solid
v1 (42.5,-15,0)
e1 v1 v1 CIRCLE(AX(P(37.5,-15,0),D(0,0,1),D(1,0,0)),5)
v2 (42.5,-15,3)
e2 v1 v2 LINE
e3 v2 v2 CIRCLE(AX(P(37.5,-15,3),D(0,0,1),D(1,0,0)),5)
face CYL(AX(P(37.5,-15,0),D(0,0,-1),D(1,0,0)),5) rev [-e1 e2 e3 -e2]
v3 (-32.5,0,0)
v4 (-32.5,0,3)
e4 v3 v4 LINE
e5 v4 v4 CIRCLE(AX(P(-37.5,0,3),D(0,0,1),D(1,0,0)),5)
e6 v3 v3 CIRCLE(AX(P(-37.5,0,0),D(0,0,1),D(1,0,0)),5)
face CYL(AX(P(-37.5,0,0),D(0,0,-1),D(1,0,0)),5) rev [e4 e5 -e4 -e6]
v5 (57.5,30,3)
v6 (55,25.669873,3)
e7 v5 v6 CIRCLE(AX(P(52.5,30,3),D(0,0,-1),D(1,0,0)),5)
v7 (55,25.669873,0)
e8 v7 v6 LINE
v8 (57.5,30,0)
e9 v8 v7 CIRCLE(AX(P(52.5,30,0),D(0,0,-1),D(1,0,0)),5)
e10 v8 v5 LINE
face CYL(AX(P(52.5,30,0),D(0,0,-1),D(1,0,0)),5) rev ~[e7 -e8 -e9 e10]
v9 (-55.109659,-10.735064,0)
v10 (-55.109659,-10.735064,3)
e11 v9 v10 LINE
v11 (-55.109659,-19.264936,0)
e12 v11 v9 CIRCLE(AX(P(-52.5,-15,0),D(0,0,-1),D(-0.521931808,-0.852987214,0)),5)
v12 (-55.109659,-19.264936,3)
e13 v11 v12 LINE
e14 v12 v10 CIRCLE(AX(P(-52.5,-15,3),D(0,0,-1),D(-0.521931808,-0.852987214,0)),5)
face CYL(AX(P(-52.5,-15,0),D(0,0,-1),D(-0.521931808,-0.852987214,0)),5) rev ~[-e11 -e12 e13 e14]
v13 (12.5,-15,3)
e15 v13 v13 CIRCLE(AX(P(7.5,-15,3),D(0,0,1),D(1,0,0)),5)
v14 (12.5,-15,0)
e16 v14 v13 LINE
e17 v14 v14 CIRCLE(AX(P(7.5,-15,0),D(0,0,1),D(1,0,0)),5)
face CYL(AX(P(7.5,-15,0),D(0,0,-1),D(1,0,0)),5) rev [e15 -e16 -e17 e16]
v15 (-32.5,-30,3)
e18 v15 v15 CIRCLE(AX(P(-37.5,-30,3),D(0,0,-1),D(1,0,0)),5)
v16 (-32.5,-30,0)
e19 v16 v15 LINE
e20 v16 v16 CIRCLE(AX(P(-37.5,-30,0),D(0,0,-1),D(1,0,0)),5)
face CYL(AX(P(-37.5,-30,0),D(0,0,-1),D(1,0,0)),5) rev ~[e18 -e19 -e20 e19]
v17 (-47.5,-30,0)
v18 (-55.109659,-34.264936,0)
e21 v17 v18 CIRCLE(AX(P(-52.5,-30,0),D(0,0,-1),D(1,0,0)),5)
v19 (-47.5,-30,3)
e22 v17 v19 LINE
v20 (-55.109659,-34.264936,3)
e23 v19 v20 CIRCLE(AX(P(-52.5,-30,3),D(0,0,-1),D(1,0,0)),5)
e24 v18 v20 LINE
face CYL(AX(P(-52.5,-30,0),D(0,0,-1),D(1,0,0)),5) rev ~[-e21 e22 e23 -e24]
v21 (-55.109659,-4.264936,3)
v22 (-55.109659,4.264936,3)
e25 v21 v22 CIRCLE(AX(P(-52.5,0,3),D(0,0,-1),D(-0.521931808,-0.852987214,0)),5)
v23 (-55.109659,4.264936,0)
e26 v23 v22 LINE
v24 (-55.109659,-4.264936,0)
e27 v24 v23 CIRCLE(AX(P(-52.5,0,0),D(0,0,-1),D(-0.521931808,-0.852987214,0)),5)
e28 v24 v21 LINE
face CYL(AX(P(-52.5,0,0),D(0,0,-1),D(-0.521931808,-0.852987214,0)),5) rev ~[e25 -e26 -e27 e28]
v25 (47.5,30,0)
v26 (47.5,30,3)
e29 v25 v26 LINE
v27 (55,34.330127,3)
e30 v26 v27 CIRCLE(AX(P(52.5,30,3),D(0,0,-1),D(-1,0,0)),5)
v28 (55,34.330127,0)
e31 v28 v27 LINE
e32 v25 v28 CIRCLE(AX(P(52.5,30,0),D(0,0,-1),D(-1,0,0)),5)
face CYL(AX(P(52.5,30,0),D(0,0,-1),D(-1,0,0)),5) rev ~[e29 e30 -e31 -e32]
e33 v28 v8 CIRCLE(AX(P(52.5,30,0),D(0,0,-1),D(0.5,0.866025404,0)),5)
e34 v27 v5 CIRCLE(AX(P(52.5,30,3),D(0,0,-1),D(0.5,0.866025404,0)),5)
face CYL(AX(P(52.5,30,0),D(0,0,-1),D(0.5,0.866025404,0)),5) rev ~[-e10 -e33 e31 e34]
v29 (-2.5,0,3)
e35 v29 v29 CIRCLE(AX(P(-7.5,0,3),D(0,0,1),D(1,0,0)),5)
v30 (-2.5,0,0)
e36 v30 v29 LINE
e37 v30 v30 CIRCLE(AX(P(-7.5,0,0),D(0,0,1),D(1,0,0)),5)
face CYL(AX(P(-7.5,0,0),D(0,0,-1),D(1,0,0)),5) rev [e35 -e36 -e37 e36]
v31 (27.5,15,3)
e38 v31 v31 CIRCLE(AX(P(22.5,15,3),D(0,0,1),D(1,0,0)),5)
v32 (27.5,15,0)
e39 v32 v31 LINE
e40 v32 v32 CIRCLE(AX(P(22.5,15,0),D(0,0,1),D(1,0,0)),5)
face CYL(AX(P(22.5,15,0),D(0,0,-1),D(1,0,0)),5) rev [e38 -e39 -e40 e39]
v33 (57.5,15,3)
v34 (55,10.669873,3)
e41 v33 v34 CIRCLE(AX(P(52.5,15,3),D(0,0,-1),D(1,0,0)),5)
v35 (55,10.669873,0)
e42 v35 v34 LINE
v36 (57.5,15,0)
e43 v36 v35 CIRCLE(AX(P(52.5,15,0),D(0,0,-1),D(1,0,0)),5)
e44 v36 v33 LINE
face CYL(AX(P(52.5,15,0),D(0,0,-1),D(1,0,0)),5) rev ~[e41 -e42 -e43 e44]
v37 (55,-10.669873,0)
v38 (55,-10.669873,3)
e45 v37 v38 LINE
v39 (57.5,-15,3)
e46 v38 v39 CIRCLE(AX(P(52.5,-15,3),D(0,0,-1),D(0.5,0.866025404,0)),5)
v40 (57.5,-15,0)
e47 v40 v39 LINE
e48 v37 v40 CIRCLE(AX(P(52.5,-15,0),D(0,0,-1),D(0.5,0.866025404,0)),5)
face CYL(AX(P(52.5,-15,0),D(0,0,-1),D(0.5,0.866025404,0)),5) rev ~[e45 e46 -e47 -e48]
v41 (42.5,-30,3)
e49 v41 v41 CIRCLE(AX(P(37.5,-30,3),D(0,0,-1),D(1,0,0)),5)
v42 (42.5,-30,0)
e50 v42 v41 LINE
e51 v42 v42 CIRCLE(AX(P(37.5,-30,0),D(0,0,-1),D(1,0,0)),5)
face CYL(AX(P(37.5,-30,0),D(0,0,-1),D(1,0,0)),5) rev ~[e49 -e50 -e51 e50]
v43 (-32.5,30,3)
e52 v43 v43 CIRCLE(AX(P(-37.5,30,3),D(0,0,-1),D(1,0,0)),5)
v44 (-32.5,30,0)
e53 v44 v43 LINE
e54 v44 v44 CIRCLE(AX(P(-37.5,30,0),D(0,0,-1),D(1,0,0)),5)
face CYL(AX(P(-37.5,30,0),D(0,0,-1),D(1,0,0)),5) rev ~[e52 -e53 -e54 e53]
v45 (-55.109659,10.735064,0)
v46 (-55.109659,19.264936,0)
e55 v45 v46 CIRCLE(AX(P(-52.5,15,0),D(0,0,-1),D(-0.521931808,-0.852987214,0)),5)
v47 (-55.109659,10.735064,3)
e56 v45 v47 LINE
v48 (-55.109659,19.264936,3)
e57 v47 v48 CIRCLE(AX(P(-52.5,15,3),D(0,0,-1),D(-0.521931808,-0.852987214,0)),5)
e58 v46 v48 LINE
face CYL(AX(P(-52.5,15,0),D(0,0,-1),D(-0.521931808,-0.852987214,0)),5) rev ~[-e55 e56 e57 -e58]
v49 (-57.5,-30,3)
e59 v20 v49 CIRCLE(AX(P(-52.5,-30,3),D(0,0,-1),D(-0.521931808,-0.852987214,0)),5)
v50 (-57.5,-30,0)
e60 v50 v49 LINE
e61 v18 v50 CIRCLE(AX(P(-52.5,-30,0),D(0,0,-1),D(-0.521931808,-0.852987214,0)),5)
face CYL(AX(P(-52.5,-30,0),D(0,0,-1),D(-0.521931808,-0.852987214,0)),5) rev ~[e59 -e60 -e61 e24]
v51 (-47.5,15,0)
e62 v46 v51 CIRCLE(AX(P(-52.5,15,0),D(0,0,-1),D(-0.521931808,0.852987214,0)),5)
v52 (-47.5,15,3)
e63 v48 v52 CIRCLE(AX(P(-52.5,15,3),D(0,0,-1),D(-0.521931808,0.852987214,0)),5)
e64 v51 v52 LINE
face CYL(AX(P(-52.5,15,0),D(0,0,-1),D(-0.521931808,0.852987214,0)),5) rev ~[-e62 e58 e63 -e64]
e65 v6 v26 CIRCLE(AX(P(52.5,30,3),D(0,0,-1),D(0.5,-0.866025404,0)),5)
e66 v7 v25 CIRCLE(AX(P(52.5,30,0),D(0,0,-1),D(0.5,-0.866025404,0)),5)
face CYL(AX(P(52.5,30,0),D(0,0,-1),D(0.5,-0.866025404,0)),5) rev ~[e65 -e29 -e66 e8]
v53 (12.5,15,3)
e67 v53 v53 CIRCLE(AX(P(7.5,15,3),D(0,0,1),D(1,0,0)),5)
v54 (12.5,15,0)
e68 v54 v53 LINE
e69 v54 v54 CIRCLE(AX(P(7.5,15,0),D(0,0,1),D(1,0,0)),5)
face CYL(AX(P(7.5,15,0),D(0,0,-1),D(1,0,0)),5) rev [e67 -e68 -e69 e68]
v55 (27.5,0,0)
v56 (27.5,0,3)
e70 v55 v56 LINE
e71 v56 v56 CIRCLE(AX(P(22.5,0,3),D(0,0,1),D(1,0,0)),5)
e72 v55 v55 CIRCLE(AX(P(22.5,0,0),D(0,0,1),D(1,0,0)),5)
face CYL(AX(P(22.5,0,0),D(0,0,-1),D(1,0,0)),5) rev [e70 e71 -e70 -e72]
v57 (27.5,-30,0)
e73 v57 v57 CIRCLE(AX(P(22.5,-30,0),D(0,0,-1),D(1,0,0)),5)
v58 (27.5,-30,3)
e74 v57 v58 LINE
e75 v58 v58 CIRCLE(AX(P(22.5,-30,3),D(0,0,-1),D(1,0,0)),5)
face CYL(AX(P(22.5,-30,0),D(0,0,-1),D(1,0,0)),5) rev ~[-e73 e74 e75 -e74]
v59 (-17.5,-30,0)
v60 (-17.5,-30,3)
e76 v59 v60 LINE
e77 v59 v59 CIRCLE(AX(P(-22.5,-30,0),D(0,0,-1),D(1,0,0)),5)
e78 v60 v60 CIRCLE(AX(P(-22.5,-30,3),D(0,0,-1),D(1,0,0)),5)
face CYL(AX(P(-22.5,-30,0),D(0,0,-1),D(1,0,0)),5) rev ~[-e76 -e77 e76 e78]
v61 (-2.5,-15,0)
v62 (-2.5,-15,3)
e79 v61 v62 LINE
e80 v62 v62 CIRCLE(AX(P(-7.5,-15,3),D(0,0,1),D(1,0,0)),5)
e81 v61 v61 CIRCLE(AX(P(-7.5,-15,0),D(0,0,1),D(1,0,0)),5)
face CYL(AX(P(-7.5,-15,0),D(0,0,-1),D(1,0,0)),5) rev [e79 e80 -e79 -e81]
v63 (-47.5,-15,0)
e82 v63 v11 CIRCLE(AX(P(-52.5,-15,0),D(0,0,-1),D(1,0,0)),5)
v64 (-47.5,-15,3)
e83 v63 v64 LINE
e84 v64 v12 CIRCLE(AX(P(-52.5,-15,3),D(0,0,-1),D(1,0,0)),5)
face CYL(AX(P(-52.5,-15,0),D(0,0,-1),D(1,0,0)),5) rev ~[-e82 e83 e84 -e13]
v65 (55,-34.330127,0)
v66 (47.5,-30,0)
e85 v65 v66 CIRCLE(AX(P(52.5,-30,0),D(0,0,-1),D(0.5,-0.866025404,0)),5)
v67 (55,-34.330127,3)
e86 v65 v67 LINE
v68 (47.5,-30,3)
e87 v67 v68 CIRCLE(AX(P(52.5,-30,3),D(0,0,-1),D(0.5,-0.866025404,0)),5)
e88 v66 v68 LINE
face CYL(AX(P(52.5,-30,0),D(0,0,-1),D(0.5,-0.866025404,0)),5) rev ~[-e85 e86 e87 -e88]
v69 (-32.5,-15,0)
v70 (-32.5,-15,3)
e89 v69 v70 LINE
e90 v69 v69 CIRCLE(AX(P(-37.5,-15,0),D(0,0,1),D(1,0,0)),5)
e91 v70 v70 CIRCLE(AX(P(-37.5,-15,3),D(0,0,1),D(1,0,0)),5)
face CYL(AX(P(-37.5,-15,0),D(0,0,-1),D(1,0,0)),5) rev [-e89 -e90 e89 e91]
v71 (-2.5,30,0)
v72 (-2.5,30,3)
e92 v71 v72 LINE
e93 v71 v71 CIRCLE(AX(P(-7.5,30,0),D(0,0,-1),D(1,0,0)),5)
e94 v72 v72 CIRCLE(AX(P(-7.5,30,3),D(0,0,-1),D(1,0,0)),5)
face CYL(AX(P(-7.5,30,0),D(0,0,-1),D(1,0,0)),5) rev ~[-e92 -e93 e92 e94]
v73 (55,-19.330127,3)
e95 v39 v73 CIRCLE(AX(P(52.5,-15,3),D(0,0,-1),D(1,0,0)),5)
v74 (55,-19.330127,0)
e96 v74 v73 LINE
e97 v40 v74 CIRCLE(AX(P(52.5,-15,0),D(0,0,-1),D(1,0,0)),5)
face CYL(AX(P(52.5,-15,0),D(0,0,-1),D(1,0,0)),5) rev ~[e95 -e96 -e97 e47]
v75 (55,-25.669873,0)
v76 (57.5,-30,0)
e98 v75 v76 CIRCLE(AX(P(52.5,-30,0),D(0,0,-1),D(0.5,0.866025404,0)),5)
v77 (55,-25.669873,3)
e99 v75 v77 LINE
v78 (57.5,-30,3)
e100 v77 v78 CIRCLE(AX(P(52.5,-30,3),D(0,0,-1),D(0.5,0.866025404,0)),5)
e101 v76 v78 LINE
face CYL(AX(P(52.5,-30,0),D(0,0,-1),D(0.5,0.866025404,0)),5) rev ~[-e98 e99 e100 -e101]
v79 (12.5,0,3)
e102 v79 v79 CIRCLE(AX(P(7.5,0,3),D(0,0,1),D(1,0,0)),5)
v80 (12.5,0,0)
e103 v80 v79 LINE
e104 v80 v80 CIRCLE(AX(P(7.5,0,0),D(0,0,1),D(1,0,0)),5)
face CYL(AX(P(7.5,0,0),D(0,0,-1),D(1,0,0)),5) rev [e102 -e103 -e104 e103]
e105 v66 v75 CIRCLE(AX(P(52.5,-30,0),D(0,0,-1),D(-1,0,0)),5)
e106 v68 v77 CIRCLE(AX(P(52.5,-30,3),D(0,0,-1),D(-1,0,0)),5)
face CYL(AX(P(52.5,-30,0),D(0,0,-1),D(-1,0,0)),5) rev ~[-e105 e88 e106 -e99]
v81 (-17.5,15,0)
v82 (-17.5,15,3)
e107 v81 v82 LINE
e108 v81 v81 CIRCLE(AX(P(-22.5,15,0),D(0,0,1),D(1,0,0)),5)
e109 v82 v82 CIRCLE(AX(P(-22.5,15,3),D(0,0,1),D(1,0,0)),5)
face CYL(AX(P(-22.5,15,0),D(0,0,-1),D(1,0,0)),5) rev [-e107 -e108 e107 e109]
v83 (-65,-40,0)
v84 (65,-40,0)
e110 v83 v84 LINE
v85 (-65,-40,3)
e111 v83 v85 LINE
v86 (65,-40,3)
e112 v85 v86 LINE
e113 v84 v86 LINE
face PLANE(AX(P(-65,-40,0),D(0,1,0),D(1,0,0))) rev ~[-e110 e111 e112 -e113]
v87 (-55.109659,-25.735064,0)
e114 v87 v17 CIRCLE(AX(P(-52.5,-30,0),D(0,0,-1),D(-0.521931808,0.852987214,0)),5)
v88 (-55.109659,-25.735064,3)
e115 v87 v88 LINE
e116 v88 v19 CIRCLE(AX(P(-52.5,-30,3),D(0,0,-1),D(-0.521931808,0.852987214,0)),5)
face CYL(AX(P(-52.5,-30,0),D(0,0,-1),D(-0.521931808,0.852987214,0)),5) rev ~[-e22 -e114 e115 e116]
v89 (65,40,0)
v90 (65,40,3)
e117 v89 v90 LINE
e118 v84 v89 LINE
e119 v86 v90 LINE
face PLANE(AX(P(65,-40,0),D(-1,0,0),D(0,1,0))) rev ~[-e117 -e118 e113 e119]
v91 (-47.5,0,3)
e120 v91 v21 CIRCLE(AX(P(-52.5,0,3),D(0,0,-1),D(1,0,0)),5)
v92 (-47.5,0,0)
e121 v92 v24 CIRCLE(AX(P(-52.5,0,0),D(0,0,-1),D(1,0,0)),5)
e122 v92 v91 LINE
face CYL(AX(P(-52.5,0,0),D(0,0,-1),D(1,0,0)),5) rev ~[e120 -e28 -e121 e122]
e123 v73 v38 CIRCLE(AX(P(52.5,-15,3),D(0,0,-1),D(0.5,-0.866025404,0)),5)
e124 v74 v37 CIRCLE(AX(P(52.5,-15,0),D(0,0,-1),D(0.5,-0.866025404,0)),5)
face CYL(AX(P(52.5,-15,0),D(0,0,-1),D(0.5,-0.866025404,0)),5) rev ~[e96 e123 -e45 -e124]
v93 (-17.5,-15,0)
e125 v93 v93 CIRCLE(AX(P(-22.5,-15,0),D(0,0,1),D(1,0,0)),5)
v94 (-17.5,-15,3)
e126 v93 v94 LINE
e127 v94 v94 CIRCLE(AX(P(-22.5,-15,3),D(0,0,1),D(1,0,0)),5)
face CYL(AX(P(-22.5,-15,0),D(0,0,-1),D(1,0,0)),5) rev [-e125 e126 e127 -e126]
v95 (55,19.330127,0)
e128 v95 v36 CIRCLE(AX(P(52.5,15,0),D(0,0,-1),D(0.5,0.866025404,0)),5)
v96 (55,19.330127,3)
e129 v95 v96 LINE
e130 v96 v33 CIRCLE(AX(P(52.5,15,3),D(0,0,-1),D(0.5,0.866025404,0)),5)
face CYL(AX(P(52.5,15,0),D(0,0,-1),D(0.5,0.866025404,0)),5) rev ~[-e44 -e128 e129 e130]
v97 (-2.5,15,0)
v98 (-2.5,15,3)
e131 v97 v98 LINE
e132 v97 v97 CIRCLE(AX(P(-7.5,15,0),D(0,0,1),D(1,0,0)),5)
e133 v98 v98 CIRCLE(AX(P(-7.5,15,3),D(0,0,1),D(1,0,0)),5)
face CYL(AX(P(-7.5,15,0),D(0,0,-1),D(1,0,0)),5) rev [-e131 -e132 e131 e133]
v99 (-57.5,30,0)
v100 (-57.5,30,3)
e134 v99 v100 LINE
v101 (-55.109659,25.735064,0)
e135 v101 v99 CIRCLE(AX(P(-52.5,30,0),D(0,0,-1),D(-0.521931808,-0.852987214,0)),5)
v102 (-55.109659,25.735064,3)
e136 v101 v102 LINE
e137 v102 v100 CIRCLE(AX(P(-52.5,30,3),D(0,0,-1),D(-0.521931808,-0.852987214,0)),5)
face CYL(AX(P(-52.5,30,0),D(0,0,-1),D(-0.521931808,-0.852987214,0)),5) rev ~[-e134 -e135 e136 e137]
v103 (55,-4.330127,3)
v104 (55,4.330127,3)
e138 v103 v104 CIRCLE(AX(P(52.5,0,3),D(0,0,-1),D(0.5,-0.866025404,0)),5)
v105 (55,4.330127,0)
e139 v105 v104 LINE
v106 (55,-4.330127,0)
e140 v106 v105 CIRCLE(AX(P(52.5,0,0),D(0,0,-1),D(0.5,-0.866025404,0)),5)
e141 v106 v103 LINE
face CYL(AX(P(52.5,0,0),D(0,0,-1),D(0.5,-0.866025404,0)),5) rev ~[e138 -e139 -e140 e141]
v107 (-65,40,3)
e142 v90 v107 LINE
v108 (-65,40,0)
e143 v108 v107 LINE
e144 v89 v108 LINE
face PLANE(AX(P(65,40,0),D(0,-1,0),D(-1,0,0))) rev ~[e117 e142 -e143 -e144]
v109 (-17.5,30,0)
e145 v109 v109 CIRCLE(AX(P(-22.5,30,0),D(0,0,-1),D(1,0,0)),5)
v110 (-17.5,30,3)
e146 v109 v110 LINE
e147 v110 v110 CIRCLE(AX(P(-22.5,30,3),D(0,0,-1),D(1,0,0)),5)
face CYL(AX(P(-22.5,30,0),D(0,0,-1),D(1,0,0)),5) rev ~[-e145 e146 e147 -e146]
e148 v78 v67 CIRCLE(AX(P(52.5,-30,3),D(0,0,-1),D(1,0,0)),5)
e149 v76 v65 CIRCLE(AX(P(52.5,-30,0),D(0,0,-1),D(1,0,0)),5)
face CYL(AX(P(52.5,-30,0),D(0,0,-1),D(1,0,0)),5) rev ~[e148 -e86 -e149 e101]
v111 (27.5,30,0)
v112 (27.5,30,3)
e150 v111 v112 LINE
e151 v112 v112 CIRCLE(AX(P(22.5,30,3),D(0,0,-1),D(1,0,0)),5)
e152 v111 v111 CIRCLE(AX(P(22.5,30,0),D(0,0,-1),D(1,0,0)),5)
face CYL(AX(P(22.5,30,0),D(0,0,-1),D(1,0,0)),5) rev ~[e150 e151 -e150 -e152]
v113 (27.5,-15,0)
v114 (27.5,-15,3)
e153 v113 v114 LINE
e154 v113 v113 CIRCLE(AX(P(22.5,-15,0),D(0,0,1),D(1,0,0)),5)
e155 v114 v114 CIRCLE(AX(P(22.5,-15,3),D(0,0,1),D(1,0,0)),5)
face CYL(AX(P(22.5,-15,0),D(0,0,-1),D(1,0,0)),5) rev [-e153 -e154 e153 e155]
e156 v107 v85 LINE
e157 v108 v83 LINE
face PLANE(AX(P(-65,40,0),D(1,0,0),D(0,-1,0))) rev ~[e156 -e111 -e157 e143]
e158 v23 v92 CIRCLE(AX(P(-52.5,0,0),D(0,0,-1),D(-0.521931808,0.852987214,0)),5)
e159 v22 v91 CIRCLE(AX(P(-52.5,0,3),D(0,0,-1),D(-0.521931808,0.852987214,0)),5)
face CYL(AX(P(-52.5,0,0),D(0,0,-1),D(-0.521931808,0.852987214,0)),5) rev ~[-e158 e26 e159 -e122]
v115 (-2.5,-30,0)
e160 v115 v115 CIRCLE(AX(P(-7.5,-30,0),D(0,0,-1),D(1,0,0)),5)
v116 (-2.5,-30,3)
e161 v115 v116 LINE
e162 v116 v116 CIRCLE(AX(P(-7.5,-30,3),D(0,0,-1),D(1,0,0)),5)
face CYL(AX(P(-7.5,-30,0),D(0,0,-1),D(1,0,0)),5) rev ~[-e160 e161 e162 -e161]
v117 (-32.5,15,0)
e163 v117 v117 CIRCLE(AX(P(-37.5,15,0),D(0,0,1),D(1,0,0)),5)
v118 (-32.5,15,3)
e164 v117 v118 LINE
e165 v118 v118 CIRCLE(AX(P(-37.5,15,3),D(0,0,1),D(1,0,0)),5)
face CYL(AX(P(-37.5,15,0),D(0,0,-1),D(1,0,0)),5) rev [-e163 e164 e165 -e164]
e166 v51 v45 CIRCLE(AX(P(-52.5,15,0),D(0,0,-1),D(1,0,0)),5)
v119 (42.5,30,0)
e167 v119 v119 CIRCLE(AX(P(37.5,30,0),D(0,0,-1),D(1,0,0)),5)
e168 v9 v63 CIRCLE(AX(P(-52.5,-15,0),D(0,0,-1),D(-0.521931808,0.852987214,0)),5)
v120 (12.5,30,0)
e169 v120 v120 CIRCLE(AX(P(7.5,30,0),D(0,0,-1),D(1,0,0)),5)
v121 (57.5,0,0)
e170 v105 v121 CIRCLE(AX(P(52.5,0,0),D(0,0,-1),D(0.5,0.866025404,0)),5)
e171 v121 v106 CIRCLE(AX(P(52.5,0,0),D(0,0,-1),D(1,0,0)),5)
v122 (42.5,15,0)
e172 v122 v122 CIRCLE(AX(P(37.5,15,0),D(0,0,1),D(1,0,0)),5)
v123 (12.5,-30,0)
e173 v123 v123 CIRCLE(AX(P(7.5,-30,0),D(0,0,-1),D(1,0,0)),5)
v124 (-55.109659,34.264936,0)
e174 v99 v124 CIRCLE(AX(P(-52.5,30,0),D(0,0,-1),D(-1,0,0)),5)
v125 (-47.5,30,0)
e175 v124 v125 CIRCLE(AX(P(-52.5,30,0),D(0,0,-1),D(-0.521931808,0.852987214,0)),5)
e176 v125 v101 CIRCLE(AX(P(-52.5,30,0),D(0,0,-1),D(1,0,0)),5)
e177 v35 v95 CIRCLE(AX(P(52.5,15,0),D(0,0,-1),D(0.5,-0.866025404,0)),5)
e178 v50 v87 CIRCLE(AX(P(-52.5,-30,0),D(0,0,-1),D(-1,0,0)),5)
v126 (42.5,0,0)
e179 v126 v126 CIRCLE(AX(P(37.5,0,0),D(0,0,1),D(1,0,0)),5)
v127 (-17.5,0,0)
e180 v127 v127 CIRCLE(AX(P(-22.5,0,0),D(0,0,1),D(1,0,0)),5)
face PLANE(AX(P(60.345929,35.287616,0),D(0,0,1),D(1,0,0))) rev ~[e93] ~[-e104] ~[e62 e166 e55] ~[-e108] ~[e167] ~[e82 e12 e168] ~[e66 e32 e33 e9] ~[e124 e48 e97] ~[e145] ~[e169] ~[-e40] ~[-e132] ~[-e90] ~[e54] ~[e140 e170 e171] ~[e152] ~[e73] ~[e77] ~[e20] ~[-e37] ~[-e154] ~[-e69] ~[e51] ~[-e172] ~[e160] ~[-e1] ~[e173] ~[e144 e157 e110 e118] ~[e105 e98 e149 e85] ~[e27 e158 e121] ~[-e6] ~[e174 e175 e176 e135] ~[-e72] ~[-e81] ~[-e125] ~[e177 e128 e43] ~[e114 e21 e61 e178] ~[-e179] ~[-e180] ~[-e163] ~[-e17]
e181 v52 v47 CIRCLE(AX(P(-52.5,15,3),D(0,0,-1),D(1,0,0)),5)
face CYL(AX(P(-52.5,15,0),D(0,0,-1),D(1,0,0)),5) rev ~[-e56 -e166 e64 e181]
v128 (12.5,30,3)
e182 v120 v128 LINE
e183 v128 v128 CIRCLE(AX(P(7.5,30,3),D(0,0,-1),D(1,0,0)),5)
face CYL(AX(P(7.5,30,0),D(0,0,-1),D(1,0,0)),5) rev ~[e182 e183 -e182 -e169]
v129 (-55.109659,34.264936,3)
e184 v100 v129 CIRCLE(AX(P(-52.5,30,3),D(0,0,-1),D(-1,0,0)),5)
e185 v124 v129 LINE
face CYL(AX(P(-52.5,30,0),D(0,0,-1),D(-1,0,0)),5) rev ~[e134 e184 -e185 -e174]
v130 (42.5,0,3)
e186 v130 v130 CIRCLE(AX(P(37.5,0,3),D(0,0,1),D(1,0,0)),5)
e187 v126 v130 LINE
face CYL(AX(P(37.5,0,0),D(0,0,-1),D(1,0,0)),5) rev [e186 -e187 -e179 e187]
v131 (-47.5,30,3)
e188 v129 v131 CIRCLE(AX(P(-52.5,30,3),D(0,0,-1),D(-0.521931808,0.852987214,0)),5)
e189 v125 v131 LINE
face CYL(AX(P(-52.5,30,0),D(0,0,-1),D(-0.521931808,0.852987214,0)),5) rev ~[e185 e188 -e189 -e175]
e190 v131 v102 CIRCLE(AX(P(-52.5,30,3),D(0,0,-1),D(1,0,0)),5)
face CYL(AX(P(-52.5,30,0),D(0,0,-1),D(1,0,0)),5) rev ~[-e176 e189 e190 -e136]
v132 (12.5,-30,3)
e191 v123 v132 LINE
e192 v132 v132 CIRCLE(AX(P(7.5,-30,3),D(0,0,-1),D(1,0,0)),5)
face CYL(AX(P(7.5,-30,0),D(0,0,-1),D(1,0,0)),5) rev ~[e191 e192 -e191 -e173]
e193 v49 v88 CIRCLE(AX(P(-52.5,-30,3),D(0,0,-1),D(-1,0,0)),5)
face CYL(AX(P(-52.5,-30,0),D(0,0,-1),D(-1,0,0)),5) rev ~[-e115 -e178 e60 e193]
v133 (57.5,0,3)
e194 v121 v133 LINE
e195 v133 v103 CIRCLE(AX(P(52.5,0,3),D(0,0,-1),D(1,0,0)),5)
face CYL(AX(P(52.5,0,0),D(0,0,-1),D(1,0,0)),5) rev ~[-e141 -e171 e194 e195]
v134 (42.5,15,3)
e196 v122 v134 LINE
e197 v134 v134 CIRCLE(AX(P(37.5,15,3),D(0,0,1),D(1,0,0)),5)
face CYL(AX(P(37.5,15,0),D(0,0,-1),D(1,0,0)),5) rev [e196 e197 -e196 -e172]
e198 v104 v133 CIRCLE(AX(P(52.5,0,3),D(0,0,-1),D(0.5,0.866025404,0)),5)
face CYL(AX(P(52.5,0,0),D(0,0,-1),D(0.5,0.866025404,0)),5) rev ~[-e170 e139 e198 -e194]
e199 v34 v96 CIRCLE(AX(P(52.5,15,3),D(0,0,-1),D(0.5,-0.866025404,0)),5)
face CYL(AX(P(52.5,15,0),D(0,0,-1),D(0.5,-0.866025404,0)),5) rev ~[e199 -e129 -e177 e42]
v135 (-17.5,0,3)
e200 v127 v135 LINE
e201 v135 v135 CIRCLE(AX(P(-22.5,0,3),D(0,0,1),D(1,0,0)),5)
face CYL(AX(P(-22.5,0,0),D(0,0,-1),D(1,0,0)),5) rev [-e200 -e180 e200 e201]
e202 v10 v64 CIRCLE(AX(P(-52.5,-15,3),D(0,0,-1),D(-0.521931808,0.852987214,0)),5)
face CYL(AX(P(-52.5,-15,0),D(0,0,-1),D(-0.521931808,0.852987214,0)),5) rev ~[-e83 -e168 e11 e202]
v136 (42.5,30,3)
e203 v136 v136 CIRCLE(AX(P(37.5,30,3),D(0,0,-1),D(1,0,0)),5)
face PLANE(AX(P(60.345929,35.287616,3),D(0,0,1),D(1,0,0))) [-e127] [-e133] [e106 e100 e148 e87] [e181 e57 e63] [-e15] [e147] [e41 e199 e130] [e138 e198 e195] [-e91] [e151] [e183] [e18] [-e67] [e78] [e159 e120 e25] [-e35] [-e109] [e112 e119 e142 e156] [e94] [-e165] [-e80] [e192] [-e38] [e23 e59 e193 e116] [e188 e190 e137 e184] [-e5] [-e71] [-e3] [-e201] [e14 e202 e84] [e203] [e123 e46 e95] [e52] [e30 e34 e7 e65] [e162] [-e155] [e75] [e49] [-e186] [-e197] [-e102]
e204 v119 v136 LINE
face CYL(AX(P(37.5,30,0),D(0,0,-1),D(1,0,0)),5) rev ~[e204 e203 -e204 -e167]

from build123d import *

# Parameters (mm, degrees)
F0_R     = 5
F1_DEPTH = 3


# Not quite as in the source:
# - a feature names something its author has since deleted; it is built from what else it names


with BuildPart() as f1:
    # F0 (on Top) → F1 (new body)
    with BuildSketch(Plane.XY):
        with BuildLine():
            Line((65, 30), (65, 40))
            Line((65, 40), (55, 40))
            Line((55, 40), (55, 34.3301270189))
            ThreePointArc((55, 34.3301270189), (56.8301270189, 32.5), (57.5, 30))
            Line((57.5, 30), (65, 30))
        make_face()
        with BuildLine():
            Line((55, 34.3301270189), (55, 40))
            Line((55, 40), (-55.1096590387, 40))
            Line((-55.1096590387, 40), (-55.1096590387, 34.2649360724))
            ThreePointArc((-55.1096590387, 34.2649360724), (-50.0554443342, 34.3616679833), (-47.5, 30))
            Line((-47.5, 30), (-42.5, 30))
            ThreePointArc((-42.5, 30), (-37.5, 35), (-32.5, 30))
            Line((-32.5, 30), (-27.5, 30))
            ThreePointArc((-27.5, 30), (-22.5, 35), (-17.5, 30))
            Line((-17.5, 30), (-12.5, 30))
            ThreePointArc((-12.5, 30), (-7.5, 35), (-2.5, 30))
            Line((-2.5, 30), (2.5, 30))
            ThreePointArc((2.5, 30), (7.5, 35), (12.5, 30))
            Line((12.5, 30), (17.5, 30))
            ThreePointArc((17.5, 30), (22.5, 35), (27.5, 30))
            Line((27.5, 30), (32.5, 30))
            ThreePointArc((32.5, 30), (37.5, 35), (42.5, 30))
            Line((42.5, 30), (47.5, 30))
            ThreePointArc((47.5, 30), (50, 34.3301270189), (55, 34.3301270189))
        make_face()
        with BuildLine():
            Line((65, -30), (65, 30))
            Line((65, 30), (57.5, 30))
            ThreePointArc((57.5, 30), (56.8301270189, 27.5), (55, 25.6698729811))
            Line((55, 25.6698729811), (55, 19.3301270189))
            ThreePointArc((55, 19.3301270189), (56.8301270189, 17.5), (57.5, 15))
            ThreePointArc((57.5, 15), (56.8301270189, 12.5), (55, 10.6698729811))
            Line((55, 10.6698729811), (55, 4.3301270189))
            ThreePointArc((55, 4.3301270189), (56.8301270189, 2.5), (57.5, 0))
            ThreePointArc((57.5, 0), (56.8301270189, -2.5), (55, -4.3301270189))
            Line((55, -4.3301270189), (55, -10.6698729811))
            ThreePointArc((55, -10.6698729811), (56.8301270189, -12.5), (57.5, -15))
            ThreePointArc((57.5, -15), (56.8301270189, -17.5), (55, -19.3301270189))
            Line((55, -19.3301270189), (55, -25.6698729811))
            ThreePointArc((55, -25.6698729811), (56.8301270189, -27.5), (57.5, -30))
            Line((57.5, -30), (65, -30))
        make_face()
        with BuildLine():
            Line((-55.1096590387, 34.2649360724), (-55.1096590387, 40))
            Line((-55.1096590387, 40), (-65, 40))
            Line((-65, 40), (-65, 30))
            Line((-65, 30), (-57.5, 30))
            ThreePointArc((-57.5, 30), (-56.8616679833, 32.4445556658), (-55.1096590387, 34.2649360724))
        make_face()
        with BuildLine():
            Line((65, -40), (65, -30))
            Line((65, -30), (57.5, -30))
            ThreePointArc((57.5, -30), (56.8301270189, -32.5), (55, -34.3301270189))
            Line((55, -34.3301270189), (55, -40))
            Line((55, -40), (65, -40))
        make_face()
        with BuildLine():
            ThreePointArc((55, 25.6698729811), (50, 25.6698729811), (47.5, 30))
            Line((47.5, 30), (42.5, 30))
            ThreePointArc((42.5, 30), (37.5, 25), (32.5, 30))
            Line((32.5, 30), (27.5, 30))
            ThreePointArc((27.5, 30), (22.5, 25), (17.5, 30))
            Line((17.5, 30), (12.5, 30))
            ThreePointArc((12.5, 30), (7.5, 25), (2.5, 30))
            Line((2.5, 30), (-2.5, 30))
            ThreePointArc((-2.5, 30), (-7.5, 25), (-12.5, 30))
            Line((-12.5, 30), (-17.5, 30))
            ThreePointArc((-17.5, 30), (-22.5, 25), (-27.5, 30))
            Line((-27.5, 30), (-32.5, 30))
            ThreePointArc((-32.5, 30), (-37.5, 25), (-42.5, 30))
            Line((-42.5, 30), (-47.5, 30))
            ThreePointArc((-47.5, 30), (-50.0554443342, 25.6383320167), (-55.1096590387, 25.7350639276))
            Line((-55.1096590387, 25.7350639276), (-55.1096590387, 19.2649360724))
            ThreePointArc((-55.1096590387, 19.2649360724), (-50.0554443342, 19.3616679833), (-47.5, 15))
            ThreePointArc((-47.5, 15), (-50.0554443342, 10.6383320167), (-55.1096590387, 10.7350639276))
            Line((-55.1096590387, 10.7350639276), (-55.1096590387, 4.2649360724))
            ThreePointArc((-55.1096590387, 4.2649360724), (-50.0554443342, 4.3616679833), (-47.5, 0))
            ThreePointArc((-47.5, 0), (-50.0554443342, -4.3616679833), (-55.1096590387, -4.2649360724))
            Line((-55.1096590387, -4.2649360724), (-55.1096590387, -10.7350639276))
            ThreePointArc((-55.1096590387, -10.7350639276), (-50.0554443342, -10.6383320167), (-47.5, -15))
            ThreePointArc((-47.5, -15), (-50.0554443342, -19.3616679833), (-55.1096590387, -19.2649360724))
            Line((-55.1096590387, -19.2649360724), (-55.1096590387, -25.7350639276))
            ThreePointArc((-55.1096590387, -25.7350639276), (-50.0554443342, -25.6383320167), (-47.5, -30))
            Line((-47.5, -30), (-42.5, -30))
            ThreePointArc((-42.5, -30), (-37.5, -25), (-32.5, -30))
            Line((-32.5, -30), (-27.5, -30))
            ThreePointArc((-27.5, -30), (-22.5, -25), (-17.5, -30))
            Line((-17.5, -30), (-12.5, -30))
            ThreePointArc((-12.5, -30), (-7.5, -25), (-2.5, -30))
            Line((-2.5, -30), (2.5, -30))
            ThreePointArc((2.5, -30), (7.5, -25), (12.5, -30))
            Line((12.5, -30), (17.5, -30))
            ThreePointArc((17.5, -30), (22.5, -25), (27.5, -30))
            Line((27.5, -30), (32.5, -30))
            ThreePointArc((32.5, -30), (37.5, -25), (42.5, -30))
            Line((42.5, -30), (47.5, -30))
            ThreePointArc((47.5, -30), (50, -25.6698729811), (55, -25.6698729811))
            Line((55, -25.6698729811), (55, -19.3301270189))
            ThreePointArc((55, -19.3301270189), (47.5, -15), (55, -10.6698729811))
            Line((55, -10.6698729811), (55, -4.3301270189))
            ThreePointArc((55, -4.3301270189), (47.5, 0), (55, 4.3301270189))
            Line((55, 4.3301270189), (55, 10.6698729811))
            ThreePointArc((55, 10.6698729811), (47.5, 15), (55, 19.3301270189))
            Line((55, 19.3301270189), (55, 25.6698729811))
        make_face()
        with Locations((-37.5, -15)):
            Circle(F0_R, mode=Mode.SUBTRACT)
        with Locations((-22.5, -15)):
            Circle(F0_R, mode=Mode.SUBTRACT)
        with Locations((-7.5, -15)):
            Circle(F0_R, mode=Mode.SUBTRACT)
        with Locations((-37.5, 0)):
            Circle(F0_R, mode=Mode.SUBTRACT)
        with Locations((-22.5, 0)):
            Circle(F0_R, mode=Mode.SUBTRACT)
        with Locations((-7.5, 0)):
            Circle(F0_R, mode=Mode.SUBTRACT)
        with Locations((7.5, -15)):
            Circle(F0_R, mode=Mode.SUBTRACT)
        with Locations((22.5, -15)):
            Circle(F0_R, mode=Mode.SUBTRACT)
        with Locations((7.5, 0)):
            Circle(F0_R, mode=Mode.SUBTRACT)
        with Locations((22.5, 0)):
            Circle(F0_R, mode=Mode.SUBTRACT)
        with Locations((37.5, -15)):
            Circle(F0_R, mode=Mode.SUBTRACT)
        with Locations((37.5, 0)):
            Circle(F0_R, mode=Mode.SUBTRACT)
        with Locations((-37.5, 15)):
            Circle(F0_R, mode=Mode.SUBTRACT)
        with Locations((-22.5, 15)):
            Circle(F0_R, mode=Mode.SUBTRACT)
        with Locations((-7.5, 15)):
            Circle(F0_R, mode=Mode.SUBTRACT)
        with Locations((7.5, 15)):
            Circle(F0_R, mode=Mode.SUBTRACT)
        with Locations((22.5, 15)):
            Circle(F0_R, mode=Mode.SUBTRACT)
        with Locations((37.5, 15)):
            Circle(F0_R, mode=Mode.SUBTRACT)
        with BuildLine():
            Line((-57.5, 30), (-65, 30))
            Line((-65, 30), (-65, -30))
            Line((-65, -30), (-57.5, -30))
            ThreePointArc((-57.5, -30), (-56.8616679833, -27.5554443342), (-55.1096590387, -25.7350639276))
            Line((-55.1096590387, -25.7350639276), (-55.1096590387, -19.2649360724))
            ThreePointArc((-55.1096590387, -19.2649360724), (-57.5, -15), (-55.1096590387, -10.7350639276))
            Line((-55.1096590387, -10.7350639276), (-55.1096590387, -4.2649360724))
            ThreePointArc((-55.1096590387, -4.2649360724), (-57.5, 0), (-55.1096590387, 4.2649360724))
            Line((-55.1096590387, 4.2649360724), (-55.1096590387, 10.7350639276))
            ThreePointArc((-55.1096590387, 10.7350639276), (-57.5, 15), (-55.1096590387, 19.2649360724))
            Line((-55.1096590387, 19.2649360724), (-55.1096590387, 25.7350639276))
            ThreePointArc((-55.1096590387, 25.7350639276), (-56.8616679833, 27.5554443342), (-57.5, 30))
        make_face()
        with BuildLine():
            Line((-55.1096590387, -40), (55, -40))
            Line((55, -40), (55, -34.3301270189))
            ThreePointArc((55, -34.3301270189), (50, -34.3301270189), (47.5, -30))
            Line((47.5, -30), (42.5, -30))
            ThreePointArc((42.5, -30), (37.5, -35), (32.5, -30))
            Line((32.5, -30), (27.5, -30))
            ThreePointArc((27.5, -30), (22.5, -35), (17.5, -30))
            Line((17.5, -30), (12.5, -30))
            ThreePointArc((12.5, -30), (7.5, -35), (2.5, -30))
            Line((2.5, -30), (-2.5, -30))
            ThreePointArc((-2.5, -30), (-7.5, -35), (-12.5, -30))
            Line((-12.5, -30), (-17.5, -30))
            ThreePointArc((-17.5, -30), (-22.5, -35), (-27.5, -30))
            Line((-27.5, -30), (-32.5, -30))
            ThreePointArc((-32.5, -30), (-37.5, -35), (-42.5, -30))
            Line((-42.5, -30), (-47.5, -30))
            ThreePointArc((-47.5, -30), (-50.0554443342, -34.3616679833), (-55.1096590387, -34.2649360724))
            Line((-55.1096590387, -34.2649360724), (-55.1096590387, -40))
        make_face()
        with BuildLine():
            Line((-57.5, -30), (-65, -30))
            Line((-65, -30), (-65, -40))
            Line((-65, -40), (-55.1096590387, -40))
            Line((-55.1096590387, -40), (-55.1096590387, -34.2649360724))
            ThreePointArc((-55.1096590387, -34.2649360724), (-56.8616679833, -32.4445556658), (-57.5, -30))
        make_face()
    extrude(amount=F1_DEPTH)


solid = f1.part
